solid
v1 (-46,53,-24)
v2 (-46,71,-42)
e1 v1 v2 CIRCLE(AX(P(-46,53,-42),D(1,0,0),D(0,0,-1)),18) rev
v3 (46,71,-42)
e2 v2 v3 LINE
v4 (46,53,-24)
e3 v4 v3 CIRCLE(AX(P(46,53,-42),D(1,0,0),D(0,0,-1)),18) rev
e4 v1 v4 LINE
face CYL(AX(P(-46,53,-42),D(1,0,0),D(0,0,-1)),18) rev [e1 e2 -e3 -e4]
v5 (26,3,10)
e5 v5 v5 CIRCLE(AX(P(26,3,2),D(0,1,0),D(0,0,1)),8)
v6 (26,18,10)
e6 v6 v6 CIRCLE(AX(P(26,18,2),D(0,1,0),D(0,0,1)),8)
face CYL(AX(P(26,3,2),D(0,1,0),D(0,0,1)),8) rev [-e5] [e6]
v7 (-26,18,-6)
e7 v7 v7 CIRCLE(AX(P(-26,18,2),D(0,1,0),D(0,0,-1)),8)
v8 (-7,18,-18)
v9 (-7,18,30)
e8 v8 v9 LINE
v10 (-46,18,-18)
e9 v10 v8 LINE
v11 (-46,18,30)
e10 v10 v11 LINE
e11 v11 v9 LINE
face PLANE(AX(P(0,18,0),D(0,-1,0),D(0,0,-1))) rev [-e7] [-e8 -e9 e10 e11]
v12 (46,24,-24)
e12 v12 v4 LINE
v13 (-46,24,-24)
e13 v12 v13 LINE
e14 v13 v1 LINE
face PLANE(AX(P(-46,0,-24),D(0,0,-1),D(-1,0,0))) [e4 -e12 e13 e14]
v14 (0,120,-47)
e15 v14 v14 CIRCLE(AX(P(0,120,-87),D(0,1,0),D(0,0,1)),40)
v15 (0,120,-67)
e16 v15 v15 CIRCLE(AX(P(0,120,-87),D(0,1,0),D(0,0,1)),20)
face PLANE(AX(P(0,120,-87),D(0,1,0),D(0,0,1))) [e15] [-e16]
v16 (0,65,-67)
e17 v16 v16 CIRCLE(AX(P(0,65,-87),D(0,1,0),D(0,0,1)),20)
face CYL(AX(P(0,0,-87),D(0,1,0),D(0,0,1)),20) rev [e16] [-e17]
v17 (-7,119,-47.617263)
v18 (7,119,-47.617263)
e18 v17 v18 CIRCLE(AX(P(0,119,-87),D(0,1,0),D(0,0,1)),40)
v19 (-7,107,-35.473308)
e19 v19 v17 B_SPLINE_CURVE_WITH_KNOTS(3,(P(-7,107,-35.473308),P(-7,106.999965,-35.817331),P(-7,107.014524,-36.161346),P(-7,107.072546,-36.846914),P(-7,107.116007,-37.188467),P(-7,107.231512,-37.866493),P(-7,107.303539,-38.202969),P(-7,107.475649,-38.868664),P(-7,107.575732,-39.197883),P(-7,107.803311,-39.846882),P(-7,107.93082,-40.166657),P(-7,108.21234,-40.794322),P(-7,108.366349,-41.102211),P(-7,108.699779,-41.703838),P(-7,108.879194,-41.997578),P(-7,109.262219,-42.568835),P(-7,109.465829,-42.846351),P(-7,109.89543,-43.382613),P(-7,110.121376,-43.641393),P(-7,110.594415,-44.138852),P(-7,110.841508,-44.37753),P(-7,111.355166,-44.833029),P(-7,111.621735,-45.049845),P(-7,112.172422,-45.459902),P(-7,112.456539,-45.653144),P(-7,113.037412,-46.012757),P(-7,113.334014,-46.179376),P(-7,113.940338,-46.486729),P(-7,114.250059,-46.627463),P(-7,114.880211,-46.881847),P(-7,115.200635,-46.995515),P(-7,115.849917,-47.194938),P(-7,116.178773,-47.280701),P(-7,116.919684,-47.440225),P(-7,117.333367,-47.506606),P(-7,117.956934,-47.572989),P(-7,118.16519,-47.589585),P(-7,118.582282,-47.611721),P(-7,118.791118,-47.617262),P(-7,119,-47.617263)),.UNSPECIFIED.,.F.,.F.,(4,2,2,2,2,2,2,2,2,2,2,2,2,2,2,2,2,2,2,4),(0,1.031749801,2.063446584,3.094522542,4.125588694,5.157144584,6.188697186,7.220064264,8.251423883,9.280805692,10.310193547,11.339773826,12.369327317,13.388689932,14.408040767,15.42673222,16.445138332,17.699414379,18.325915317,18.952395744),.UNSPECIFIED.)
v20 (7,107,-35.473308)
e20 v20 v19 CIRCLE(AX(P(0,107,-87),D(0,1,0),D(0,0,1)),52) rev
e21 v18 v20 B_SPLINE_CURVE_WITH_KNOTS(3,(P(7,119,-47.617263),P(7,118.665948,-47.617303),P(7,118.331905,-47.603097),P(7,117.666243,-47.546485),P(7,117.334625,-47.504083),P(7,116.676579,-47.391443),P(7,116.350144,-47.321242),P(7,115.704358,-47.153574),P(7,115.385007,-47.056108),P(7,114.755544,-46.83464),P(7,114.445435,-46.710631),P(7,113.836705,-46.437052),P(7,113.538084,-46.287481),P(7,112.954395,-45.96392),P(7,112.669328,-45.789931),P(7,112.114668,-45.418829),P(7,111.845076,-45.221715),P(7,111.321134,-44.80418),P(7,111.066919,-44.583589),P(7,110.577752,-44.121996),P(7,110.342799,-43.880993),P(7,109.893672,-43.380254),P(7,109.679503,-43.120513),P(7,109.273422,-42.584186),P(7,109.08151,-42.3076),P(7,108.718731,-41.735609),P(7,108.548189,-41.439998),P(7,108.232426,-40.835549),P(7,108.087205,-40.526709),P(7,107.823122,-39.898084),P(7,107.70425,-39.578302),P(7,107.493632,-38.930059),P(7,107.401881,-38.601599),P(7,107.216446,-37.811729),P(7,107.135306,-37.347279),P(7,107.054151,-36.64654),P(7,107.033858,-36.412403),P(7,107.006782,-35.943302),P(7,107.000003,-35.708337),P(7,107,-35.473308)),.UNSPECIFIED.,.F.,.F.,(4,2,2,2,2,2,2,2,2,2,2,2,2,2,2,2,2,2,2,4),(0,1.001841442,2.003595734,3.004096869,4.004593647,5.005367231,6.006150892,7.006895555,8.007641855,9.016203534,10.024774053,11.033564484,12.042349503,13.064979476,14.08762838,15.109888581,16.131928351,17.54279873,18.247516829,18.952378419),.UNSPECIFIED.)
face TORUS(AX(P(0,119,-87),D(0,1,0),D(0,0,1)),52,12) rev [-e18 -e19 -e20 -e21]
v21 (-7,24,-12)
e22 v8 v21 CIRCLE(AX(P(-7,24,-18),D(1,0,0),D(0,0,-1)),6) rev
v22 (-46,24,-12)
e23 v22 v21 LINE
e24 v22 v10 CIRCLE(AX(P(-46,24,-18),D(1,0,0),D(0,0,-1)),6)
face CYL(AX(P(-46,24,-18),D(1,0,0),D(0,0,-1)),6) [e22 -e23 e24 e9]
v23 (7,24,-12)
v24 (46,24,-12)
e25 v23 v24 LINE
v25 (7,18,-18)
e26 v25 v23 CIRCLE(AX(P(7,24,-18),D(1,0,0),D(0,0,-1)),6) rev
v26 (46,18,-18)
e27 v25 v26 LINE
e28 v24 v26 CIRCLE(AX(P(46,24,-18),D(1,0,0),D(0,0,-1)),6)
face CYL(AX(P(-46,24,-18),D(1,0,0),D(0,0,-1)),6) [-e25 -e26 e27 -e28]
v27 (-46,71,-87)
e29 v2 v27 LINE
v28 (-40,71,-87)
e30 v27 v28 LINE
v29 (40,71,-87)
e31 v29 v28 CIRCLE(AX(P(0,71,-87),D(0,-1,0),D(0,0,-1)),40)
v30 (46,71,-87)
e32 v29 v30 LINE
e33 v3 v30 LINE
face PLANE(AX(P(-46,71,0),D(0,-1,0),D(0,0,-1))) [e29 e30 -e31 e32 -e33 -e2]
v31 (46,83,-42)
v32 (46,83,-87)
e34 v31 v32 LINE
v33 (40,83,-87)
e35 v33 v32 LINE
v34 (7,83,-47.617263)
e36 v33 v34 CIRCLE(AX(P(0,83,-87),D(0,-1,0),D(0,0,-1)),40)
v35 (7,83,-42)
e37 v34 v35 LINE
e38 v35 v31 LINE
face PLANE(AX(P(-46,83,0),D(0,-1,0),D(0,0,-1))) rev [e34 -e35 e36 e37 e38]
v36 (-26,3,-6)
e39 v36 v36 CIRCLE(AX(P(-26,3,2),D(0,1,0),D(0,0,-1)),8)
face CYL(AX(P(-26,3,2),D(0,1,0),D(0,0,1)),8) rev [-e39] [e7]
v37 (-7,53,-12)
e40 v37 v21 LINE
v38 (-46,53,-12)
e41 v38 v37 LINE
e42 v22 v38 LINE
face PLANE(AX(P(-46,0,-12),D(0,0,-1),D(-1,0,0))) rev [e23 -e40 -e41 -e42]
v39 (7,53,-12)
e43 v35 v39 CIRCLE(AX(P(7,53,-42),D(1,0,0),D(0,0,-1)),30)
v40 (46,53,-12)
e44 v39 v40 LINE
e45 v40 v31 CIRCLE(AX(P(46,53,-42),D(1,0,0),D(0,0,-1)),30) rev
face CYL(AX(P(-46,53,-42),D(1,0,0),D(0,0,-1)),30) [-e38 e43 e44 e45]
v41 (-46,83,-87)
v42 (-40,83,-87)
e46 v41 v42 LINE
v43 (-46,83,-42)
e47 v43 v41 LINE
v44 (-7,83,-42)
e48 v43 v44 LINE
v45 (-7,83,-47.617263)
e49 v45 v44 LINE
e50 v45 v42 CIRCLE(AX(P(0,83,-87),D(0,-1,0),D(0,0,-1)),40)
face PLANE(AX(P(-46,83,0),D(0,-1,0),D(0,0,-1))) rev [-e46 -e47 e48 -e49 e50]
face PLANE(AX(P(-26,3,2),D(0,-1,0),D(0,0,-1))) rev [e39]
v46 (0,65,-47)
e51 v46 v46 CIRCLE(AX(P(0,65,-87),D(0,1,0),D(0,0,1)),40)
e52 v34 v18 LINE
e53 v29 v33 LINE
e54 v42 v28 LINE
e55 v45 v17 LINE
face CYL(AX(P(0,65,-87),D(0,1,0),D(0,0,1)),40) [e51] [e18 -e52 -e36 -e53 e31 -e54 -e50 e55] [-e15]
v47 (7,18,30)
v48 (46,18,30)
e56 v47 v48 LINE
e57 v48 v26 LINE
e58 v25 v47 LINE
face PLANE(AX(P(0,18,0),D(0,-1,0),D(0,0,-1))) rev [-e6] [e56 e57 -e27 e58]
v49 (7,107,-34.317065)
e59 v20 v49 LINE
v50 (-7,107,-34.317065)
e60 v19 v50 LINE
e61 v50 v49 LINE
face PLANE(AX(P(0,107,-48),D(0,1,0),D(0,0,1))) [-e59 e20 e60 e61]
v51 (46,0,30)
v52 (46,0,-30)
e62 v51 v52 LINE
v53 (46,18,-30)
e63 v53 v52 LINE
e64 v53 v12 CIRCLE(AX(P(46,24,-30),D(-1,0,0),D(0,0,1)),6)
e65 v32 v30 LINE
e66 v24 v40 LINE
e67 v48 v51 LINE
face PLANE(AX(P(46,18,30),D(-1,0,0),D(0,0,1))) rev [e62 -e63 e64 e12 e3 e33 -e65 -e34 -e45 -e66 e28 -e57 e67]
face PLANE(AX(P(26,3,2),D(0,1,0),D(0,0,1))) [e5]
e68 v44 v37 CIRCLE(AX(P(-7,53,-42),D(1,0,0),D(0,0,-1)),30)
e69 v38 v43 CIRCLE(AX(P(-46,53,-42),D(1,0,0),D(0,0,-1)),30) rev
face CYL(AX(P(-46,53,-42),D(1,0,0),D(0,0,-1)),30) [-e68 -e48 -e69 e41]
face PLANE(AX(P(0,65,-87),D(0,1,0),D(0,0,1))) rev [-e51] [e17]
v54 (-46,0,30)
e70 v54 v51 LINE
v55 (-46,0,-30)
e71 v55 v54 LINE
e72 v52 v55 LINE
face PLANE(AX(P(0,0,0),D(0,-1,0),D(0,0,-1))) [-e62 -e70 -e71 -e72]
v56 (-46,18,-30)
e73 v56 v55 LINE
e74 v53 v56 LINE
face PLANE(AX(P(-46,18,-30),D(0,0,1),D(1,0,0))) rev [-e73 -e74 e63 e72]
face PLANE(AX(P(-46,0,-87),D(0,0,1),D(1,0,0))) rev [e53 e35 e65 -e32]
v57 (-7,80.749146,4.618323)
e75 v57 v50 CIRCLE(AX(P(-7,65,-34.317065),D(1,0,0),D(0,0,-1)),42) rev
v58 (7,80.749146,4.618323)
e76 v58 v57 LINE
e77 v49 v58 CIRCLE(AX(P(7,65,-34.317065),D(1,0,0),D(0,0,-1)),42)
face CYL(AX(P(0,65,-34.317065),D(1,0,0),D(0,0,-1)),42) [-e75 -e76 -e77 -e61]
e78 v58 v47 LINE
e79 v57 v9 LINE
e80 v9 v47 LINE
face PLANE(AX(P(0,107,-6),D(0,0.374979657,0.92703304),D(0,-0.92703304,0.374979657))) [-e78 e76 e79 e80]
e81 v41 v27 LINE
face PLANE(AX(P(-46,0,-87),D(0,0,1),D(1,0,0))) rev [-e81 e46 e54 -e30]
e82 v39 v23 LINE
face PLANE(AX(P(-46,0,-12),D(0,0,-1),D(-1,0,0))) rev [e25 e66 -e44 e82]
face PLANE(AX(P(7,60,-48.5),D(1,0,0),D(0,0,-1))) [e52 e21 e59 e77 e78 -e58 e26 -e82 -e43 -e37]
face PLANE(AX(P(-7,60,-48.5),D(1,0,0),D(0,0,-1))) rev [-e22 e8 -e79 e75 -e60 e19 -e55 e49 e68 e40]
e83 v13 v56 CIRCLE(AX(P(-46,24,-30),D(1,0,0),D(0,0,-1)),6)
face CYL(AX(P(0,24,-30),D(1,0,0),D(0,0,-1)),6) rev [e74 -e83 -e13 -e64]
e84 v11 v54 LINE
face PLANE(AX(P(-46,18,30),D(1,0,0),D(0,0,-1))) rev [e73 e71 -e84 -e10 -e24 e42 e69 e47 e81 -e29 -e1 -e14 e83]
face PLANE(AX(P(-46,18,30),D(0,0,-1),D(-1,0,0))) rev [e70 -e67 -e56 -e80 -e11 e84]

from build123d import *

# Parameters (mm, degrees)
CROQUIS1_W                   = 92
CROQUIS1_H                   = 60
SALIENTE_EXTRUIR1_DEPTH      = 18
CROQUIS2_R                   = 8
CORTAR_EXTRUIR1_DEPTH        = 15
SALIENTE_EXTRUIR2_DEPTH      = 92
REDONDEO1_R                  = 6
SALIENTE_EXTRUIR4_DEPTH      = 37
SALIENTE_EXTRUIR4_DEPTH_BACK = 18
CROQUIS4_R                   = 40
CROQUIS5_R                   = 20
CORTAR_EXTRUIR2_DEPTH        = 181.679273853
NERVIO1_START                = -7
NERVIO1_DEPTH                = 14
REDONDEO2_R                  = 42
REDONDEO3_R                  = 12


# Read off the part's stored shape, not the designer's step: Nervio1
with BuildPart() as part:
    # Croquis1 → Saliente-Extruir1 (new body)
    with BuildSketch(Plane(origin=(0, 0, 0), x_dir=(1, 0, 0), z_dir=(0, 1, 0))):
        Rectangle(CROQUIS1_W, CROQUIS1_H)
    extrude(amount=SALIENTE_EXTRUIR1_DEPTH)

    # Croquis2 → Cortar-Extruir1 (cut)
    with BuildSketch(Plane(origin=(0, 18, 0), x_dir=(1, 0, 0), z_dir=(0, 1, 0))):
        with Locations(Location((26, -2, 0), (0, 0, 270))):
            Circle(CROQUIS2_R)
        with Locations(Location((-26, -2, 0), (0, 0, 90))):
            Circle(CROQUIS2_R)
    extrude(amount=-CORTAR_EXTRUIR1_DEPTH, mode=Mode.SUBTRACT)

    # Croquis3 → Saliente-Extruir2 (add, through all)
    with BuildSketch(Plane(origin=(46, 0, 0), x_dir=(0, 0, -1), z_dir=(1, 0, 0))):
        with BuildLine():
            Line((18, 18), (24, 18))
            Line((24, 18), (24, 53))
            ThreePointArc((24, 53), (29.272077939, 65.727922061), (42, 71))
            Line((42, 71), (87, 71))
            Line((87, 71), (87, 83))
            Line((87, 83), (42, 83))
            ThreePointArc((42, 83), (20.786796564, 74.213203436), (12, 53))
            Line((12, 53), (12, 24))
            ThreePointArc((12, 24), (13.757359313, 19.757359313), (18, 18))
        make_face()
    extrude(amount=-SALIENTE_EXTRUIR2_DEPTH)

    # Redondeo1
    redondeo1_edges = [part.edges().sort_by_distance(p)[0] for p in [
        (0, 18, -24),
    ]]
    fillet(redondeo1_edges, radius=REDONDEO1_R - 0.0001)  # a hair under: the kernel refuses the full size

    # Croquis4 → Saliente-Extruir4 (add, two sides: drawn at the far end of the back side and taken through both)
    with BuildSketch(Plane(origin=(0, 83, 0), x_dir=(1, 0, 0), z_dir=(0, 1, 0)).offset(-SALIENTE_EXTRUIR4_DEPTH_BACK)):
        with Locations(Location((0, 87, 0), (0, 0, 270))):
            Circle(CROQUIS4_R)
    extrude(amount=SALIENTE_EXTRUIR4_DEPTH + SALIENTE_EXTRUIR4_DEPTH_BACK)

    # Croquis5 → Cortar-Extruir2 (cut, through all)
    with BuildSketch(Plane(origin=(0, 120, 0), x_dir=(1, 0, 0), z_dir=(0, 1, 0))):
        with Locations(Location((0, 87, 0), (0, 0, 270))):
            Circle(CROQUIS5_R)
    extrude(amount=-CORTAR_EXTRUIR2_DEPTH, mode=Mode.SUBTRACT)

    # Nervio1 outline → Nervio1 (add)
    with BuildSketch(Plane(origin=(0, 0, 0), x_dir=(0, 0, -1), z_dir=(1, 0, 0)).offset(NERVIO1_START)):
        with BuildLine():
            Line((42, 83), (48, 83))
            Line((48, 83), (48, 107))
            Line((48, 107), (6, 107))
            Line((6, 107), (-30, 18))
            Line((-30, 18), (18, 18))
            ThreePointArc((18, 18), (13.757359313, 19.757359313), (12, 24))
            Line((12, 24), (12, 53))
            ThreePointArc((12, 53), (20.786796564, 74.213203436), (42, 83))
        make_face()
    extrude(amount=NERVIO1_DEPTH)

    # Redondeo2
    redondeo2_edges = [part.edges().sort_by_distance(p)[0] for p in [
        (0, 107, -6),
    ]]
    fillet(redondeo2_edges, radius=REDONDEO2_R)

    # Redondeo3
    redondeo3_edges = [part.edges().sort_by_distance(p)[0] for p in [
        (-3.513581264, 107, -47.154614487),
    ]]
    fillet(redondeo3_edges, radius=REDONDEO3_R)


solid = part.part
